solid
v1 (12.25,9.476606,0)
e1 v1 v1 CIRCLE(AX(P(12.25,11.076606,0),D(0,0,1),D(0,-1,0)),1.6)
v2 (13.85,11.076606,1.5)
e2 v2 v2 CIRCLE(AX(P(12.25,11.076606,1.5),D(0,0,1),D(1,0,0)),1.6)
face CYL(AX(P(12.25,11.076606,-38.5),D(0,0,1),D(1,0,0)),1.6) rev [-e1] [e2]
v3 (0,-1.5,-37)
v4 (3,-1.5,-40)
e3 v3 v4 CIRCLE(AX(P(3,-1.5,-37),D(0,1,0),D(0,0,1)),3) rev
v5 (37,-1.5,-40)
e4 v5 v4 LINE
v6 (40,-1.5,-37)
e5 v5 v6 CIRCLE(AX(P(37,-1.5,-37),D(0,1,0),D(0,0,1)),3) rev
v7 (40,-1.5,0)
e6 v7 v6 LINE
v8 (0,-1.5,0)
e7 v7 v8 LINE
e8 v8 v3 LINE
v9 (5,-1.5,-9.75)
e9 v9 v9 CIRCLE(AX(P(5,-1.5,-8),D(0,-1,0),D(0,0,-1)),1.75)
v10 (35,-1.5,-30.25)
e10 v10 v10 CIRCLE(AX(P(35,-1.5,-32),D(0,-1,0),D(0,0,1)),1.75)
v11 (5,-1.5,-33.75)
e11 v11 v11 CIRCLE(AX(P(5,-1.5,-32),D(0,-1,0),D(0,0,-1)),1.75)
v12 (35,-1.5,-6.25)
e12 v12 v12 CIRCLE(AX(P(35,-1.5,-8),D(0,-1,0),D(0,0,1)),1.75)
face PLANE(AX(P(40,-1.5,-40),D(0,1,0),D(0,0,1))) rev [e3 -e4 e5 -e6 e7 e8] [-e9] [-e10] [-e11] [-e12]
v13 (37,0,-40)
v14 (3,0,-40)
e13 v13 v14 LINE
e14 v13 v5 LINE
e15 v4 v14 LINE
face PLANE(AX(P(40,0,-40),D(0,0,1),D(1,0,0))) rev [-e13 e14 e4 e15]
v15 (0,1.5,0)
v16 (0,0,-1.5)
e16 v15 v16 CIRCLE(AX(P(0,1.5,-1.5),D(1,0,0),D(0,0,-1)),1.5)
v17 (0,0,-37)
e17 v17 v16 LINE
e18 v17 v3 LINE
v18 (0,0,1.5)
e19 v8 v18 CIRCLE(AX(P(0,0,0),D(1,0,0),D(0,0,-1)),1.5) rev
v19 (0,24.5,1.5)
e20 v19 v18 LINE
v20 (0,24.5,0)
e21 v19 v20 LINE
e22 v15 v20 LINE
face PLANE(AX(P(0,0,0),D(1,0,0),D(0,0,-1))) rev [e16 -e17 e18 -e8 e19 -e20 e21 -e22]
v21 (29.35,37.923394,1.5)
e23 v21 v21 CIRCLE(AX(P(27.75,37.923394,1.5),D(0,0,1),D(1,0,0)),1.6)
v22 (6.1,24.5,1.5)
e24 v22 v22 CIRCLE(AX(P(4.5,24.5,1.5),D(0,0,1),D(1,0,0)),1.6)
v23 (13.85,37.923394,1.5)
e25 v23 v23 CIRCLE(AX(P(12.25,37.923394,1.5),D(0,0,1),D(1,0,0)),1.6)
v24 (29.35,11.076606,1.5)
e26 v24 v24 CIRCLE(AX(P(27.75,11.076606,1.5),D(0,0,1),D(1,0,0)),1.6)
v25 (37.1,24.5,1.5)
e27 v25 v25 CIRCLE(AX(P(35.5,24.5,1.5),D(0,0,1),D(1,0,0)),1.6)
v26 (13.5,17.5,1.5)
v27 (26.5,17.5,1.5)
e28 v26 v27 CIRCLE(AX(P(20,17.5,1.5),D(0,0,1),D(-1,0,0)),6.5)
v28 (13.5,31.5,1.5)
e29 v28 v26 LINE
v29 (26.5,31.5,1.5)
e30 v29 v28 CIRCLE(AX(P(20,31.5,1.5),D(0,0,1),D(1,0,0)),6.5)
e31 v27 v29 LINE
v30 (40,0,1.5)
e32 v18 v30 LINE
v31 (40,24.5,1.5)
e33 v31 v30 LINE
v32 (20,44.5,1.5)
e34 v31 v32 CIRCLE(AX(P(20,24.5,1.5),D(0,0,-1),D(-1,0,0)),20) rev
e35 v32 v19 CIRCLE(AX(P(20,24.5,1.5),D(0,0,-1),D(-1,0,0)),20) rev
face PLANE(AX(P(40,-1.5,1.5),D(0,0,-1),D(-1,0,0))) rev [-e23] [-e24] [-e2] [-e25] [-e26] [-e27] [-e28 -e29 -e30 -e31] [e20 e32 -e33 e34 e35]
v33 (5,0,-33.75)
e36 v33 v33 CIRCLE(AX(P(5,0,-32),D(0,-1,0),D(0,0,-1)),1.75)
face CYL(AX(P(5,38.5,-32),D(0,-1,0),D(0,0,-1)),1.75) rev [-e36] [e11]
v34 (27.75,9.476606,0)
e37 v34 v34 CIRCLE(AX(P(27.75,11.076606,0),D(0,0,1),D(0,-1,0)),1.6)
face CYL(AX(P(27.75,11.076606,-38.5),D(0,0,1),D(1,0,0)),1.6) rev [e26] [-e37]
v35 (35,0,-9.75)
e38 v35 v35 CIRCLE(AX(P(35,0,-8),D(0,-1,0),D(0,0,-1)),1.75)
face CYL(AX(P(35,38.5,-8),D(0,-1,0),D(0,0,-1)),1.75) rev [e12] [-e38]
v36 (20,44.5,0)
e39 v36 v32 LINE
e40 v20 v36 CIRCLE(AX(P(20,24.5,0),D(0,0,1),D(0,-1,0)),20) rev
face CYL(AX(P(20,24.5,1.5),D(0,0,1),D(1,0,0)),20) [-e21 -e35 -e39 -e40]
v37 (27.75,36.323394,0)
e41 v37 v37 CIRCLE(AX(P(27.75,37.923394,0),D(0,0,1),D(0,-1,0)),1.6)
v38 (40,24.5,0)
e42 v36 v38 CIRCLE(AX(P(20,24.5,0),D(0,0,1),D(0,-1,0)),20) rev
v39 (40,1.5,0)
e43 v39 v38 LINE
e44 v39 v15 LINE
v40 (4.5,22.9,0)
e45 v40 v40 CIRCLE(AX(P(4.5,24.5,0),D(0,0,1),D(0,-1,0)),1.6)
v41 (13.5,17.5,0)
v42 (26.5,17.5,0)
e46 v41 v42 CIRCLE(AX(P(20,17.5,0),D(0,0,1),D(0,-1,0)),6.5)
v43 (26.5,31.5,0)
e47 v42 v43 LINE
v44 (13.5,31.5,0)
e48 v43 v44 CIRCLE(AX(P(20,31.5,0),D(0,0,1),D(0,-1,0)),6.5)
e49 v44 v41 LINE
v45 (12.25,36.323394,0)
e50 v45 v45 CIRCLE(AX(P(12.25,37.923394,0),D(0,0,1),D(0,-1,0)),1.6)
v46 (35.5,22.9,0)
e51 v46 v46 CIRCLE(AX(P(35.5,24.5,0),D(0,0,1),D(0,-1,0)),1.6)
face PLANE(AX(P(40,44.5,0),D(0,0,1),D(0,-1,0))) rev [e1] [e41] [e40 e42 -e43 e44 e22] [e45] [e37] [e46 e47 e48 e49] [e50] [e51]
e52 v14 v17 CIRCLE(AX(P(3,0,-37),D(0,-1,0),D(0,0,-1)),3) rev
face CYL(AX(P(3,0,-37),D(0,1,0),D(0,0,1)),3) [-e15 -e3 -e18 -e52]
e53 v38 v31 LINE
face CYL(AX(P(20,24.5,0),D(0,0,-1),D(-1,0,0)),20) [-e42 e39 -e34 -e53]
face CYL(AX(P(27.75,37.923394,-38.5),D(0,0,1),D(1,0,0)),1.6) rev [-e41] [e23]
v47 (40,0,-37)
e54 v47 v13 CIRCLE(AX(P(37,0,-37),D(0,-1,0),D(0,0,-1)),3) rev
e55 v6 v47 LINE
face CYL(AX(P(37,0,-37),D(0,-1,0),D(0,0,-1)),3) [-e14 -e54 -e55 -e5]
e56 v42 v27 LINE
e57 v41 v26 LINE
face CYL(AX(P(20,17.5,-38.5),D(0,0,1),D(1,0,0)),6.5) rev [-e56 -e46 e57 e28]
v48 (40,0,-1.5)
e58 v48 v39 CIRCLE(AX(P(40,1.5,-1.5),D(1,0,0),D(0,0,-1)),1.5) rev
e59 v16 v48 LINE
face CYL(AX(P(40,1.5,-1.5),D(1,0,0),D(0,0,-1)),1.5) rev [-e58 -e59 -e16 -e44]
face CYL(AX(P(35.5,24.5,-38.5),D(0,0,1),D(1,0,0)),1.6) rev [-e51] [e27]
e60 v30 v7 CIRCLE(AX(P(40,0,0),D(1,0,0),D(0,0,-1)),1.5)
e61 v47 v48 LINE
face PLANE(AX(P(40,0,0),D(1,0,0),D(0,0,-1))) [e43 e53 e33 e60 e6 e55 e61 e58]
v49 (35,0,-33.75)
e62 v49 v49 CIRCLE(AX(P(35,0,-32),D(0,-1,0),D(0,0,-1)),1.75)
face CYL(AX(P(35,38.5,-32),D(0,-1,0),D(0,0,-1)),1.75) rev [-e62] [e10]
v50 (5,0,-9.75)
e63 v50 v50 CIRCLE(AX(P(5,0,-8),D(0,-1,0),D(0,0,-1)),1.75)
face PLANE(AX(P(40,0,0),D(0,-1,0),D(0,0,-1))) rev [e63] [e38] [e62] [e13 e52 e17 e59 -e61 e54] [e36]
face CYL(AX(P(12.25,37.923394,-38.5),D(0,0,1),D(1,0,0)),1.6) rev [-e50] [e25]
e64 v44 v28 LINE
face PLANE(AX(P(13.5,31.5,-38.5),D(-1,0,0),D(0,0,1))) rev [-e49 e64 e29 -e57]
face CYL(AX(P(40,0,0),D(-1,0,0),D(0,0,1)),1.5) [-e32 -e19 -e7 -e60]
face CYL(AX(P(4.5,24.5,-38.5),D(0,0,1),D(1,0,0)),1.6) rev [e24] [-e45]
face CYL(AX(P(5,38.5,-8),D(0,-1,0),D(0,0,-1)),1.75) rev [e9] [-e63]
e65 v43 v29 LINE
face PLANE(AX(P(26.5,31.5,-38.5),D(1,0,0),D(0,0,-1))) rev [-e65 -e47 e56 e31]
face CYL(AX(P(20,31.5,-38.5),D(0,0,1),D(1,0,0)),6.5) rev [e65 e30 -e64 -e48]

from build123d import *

# Parameters (mm, degrees)
BOSS_EXTRUDE1_DEPTH = 40
SKETCH2_R           = 1.75
CUT_EXTRUDE1_DEPTH  = 40
FILLET1_R           = 3
FILLET2_R           = 20
SKETCH3_R           = 1.6
CUT_EXTRUDE2_DEPTH  = 40
FILLET3_R           = 1.5


with BuildPart() as part:
    # Sketch1 → Boss-Extrude1 (new body)
    with BuildSketch(Plane(origin=(0, 0, 0), x_dir=(0, 0, -1), z_dir=(1, 0, 0))):
        Polygon((0, 0), (40, 0), (40, -1.5), (-1.5, -1.5), (-1.5, 44.5), (0, 44.5), align=None)
    extrude(amount=BOSS_EXTRUDE1_DEPTH)

    # Sketch2 → Cut-Extrude1 (cut)
    with BuildSketch(Plane.XZ.offset(1.5)):
        with Locations(Location((5, -32, 0), (0, 0, 270))):
            Circle(SKETCH2_R)
        with Locations(Location((5, -8, 0), (0, 0, 270))):
            Circle(SKETCH2_R)
        with Locations(Location((35, -8, 0), (0, 0, 270))):
            Circle(SKETCH2_R)
        with Locations(Location((35, -32, 0), (0, 0, 270))):
            Circle(SKETCH2_R)
    extrude(amount=-CUT_EXTRUDE1_DEPTH, mode=Mode.SUBTRACT)

    # Fillet1
    fillet1_edges = [part.edges().sort_by_distance(p)[0] for p in [
        (40, -0.75, -40),
        (0, -0.75, -40),
    ]]
    fillet(fillet1_edges, radius=FILLET1_R)

    # Fillet2
    fillet2_edges = [part.edges().sort_by_distance(p)[0] for p in [
        (40, 44.5, 0.75),
        (0, 44.5, 0.75),
    ]]
    fillet(fillet2_edges, radius=FILLET2_R - 0.0001)  # a hair under: the kernel refuses the full size

    # Sketch3 → Cut-Extrude2 (cut)
    with BuildSketch(Plane.XY.offset(1.5)):
        with Locations((4.5, 24.5)):
            Circle(SKETCH3_R)
        with Locations((12.25, 37.923393759)):
            Circle(SKETCH3_R)
        with Locations((27.75, 37.923393759)):
            Circle(SKETCH3_R)
        with Locations((35.5, 24.5)):
            Circle(SKETCH3_R)
        with Locations((27.75, 11.076606241)):
            Circle(SKETCH3_R)
        with Locations((12.25, 11.076606241)):
            Circle(SKETCH3_R)
        with BuildLine():
            Line((26.5, 31.5), (26.5, 17.5))
            ThreePointArc((26.5, 17.5), (20, 11), (13.5, 17.5))
            Line((13.5, 17.5), (13.5, 31.5))
            ThreePointArc((13.5, 31.5), (20, 38), (26.5, 31.5))
        make_face()
    extrude(amount=-CUT_EXTRUDE2_DEPTH, mode=Mode.SUBTRACT)

    # Fillet3
    fillet3_edges = [part.edges().sort_by_distance(p)[0] for p in [
        (20, 0, 0),
        (20, -1.5, 1.5),
    ]]
    fillet(fillet3_edges, radius=FILLET3_R)


solid = part.part
